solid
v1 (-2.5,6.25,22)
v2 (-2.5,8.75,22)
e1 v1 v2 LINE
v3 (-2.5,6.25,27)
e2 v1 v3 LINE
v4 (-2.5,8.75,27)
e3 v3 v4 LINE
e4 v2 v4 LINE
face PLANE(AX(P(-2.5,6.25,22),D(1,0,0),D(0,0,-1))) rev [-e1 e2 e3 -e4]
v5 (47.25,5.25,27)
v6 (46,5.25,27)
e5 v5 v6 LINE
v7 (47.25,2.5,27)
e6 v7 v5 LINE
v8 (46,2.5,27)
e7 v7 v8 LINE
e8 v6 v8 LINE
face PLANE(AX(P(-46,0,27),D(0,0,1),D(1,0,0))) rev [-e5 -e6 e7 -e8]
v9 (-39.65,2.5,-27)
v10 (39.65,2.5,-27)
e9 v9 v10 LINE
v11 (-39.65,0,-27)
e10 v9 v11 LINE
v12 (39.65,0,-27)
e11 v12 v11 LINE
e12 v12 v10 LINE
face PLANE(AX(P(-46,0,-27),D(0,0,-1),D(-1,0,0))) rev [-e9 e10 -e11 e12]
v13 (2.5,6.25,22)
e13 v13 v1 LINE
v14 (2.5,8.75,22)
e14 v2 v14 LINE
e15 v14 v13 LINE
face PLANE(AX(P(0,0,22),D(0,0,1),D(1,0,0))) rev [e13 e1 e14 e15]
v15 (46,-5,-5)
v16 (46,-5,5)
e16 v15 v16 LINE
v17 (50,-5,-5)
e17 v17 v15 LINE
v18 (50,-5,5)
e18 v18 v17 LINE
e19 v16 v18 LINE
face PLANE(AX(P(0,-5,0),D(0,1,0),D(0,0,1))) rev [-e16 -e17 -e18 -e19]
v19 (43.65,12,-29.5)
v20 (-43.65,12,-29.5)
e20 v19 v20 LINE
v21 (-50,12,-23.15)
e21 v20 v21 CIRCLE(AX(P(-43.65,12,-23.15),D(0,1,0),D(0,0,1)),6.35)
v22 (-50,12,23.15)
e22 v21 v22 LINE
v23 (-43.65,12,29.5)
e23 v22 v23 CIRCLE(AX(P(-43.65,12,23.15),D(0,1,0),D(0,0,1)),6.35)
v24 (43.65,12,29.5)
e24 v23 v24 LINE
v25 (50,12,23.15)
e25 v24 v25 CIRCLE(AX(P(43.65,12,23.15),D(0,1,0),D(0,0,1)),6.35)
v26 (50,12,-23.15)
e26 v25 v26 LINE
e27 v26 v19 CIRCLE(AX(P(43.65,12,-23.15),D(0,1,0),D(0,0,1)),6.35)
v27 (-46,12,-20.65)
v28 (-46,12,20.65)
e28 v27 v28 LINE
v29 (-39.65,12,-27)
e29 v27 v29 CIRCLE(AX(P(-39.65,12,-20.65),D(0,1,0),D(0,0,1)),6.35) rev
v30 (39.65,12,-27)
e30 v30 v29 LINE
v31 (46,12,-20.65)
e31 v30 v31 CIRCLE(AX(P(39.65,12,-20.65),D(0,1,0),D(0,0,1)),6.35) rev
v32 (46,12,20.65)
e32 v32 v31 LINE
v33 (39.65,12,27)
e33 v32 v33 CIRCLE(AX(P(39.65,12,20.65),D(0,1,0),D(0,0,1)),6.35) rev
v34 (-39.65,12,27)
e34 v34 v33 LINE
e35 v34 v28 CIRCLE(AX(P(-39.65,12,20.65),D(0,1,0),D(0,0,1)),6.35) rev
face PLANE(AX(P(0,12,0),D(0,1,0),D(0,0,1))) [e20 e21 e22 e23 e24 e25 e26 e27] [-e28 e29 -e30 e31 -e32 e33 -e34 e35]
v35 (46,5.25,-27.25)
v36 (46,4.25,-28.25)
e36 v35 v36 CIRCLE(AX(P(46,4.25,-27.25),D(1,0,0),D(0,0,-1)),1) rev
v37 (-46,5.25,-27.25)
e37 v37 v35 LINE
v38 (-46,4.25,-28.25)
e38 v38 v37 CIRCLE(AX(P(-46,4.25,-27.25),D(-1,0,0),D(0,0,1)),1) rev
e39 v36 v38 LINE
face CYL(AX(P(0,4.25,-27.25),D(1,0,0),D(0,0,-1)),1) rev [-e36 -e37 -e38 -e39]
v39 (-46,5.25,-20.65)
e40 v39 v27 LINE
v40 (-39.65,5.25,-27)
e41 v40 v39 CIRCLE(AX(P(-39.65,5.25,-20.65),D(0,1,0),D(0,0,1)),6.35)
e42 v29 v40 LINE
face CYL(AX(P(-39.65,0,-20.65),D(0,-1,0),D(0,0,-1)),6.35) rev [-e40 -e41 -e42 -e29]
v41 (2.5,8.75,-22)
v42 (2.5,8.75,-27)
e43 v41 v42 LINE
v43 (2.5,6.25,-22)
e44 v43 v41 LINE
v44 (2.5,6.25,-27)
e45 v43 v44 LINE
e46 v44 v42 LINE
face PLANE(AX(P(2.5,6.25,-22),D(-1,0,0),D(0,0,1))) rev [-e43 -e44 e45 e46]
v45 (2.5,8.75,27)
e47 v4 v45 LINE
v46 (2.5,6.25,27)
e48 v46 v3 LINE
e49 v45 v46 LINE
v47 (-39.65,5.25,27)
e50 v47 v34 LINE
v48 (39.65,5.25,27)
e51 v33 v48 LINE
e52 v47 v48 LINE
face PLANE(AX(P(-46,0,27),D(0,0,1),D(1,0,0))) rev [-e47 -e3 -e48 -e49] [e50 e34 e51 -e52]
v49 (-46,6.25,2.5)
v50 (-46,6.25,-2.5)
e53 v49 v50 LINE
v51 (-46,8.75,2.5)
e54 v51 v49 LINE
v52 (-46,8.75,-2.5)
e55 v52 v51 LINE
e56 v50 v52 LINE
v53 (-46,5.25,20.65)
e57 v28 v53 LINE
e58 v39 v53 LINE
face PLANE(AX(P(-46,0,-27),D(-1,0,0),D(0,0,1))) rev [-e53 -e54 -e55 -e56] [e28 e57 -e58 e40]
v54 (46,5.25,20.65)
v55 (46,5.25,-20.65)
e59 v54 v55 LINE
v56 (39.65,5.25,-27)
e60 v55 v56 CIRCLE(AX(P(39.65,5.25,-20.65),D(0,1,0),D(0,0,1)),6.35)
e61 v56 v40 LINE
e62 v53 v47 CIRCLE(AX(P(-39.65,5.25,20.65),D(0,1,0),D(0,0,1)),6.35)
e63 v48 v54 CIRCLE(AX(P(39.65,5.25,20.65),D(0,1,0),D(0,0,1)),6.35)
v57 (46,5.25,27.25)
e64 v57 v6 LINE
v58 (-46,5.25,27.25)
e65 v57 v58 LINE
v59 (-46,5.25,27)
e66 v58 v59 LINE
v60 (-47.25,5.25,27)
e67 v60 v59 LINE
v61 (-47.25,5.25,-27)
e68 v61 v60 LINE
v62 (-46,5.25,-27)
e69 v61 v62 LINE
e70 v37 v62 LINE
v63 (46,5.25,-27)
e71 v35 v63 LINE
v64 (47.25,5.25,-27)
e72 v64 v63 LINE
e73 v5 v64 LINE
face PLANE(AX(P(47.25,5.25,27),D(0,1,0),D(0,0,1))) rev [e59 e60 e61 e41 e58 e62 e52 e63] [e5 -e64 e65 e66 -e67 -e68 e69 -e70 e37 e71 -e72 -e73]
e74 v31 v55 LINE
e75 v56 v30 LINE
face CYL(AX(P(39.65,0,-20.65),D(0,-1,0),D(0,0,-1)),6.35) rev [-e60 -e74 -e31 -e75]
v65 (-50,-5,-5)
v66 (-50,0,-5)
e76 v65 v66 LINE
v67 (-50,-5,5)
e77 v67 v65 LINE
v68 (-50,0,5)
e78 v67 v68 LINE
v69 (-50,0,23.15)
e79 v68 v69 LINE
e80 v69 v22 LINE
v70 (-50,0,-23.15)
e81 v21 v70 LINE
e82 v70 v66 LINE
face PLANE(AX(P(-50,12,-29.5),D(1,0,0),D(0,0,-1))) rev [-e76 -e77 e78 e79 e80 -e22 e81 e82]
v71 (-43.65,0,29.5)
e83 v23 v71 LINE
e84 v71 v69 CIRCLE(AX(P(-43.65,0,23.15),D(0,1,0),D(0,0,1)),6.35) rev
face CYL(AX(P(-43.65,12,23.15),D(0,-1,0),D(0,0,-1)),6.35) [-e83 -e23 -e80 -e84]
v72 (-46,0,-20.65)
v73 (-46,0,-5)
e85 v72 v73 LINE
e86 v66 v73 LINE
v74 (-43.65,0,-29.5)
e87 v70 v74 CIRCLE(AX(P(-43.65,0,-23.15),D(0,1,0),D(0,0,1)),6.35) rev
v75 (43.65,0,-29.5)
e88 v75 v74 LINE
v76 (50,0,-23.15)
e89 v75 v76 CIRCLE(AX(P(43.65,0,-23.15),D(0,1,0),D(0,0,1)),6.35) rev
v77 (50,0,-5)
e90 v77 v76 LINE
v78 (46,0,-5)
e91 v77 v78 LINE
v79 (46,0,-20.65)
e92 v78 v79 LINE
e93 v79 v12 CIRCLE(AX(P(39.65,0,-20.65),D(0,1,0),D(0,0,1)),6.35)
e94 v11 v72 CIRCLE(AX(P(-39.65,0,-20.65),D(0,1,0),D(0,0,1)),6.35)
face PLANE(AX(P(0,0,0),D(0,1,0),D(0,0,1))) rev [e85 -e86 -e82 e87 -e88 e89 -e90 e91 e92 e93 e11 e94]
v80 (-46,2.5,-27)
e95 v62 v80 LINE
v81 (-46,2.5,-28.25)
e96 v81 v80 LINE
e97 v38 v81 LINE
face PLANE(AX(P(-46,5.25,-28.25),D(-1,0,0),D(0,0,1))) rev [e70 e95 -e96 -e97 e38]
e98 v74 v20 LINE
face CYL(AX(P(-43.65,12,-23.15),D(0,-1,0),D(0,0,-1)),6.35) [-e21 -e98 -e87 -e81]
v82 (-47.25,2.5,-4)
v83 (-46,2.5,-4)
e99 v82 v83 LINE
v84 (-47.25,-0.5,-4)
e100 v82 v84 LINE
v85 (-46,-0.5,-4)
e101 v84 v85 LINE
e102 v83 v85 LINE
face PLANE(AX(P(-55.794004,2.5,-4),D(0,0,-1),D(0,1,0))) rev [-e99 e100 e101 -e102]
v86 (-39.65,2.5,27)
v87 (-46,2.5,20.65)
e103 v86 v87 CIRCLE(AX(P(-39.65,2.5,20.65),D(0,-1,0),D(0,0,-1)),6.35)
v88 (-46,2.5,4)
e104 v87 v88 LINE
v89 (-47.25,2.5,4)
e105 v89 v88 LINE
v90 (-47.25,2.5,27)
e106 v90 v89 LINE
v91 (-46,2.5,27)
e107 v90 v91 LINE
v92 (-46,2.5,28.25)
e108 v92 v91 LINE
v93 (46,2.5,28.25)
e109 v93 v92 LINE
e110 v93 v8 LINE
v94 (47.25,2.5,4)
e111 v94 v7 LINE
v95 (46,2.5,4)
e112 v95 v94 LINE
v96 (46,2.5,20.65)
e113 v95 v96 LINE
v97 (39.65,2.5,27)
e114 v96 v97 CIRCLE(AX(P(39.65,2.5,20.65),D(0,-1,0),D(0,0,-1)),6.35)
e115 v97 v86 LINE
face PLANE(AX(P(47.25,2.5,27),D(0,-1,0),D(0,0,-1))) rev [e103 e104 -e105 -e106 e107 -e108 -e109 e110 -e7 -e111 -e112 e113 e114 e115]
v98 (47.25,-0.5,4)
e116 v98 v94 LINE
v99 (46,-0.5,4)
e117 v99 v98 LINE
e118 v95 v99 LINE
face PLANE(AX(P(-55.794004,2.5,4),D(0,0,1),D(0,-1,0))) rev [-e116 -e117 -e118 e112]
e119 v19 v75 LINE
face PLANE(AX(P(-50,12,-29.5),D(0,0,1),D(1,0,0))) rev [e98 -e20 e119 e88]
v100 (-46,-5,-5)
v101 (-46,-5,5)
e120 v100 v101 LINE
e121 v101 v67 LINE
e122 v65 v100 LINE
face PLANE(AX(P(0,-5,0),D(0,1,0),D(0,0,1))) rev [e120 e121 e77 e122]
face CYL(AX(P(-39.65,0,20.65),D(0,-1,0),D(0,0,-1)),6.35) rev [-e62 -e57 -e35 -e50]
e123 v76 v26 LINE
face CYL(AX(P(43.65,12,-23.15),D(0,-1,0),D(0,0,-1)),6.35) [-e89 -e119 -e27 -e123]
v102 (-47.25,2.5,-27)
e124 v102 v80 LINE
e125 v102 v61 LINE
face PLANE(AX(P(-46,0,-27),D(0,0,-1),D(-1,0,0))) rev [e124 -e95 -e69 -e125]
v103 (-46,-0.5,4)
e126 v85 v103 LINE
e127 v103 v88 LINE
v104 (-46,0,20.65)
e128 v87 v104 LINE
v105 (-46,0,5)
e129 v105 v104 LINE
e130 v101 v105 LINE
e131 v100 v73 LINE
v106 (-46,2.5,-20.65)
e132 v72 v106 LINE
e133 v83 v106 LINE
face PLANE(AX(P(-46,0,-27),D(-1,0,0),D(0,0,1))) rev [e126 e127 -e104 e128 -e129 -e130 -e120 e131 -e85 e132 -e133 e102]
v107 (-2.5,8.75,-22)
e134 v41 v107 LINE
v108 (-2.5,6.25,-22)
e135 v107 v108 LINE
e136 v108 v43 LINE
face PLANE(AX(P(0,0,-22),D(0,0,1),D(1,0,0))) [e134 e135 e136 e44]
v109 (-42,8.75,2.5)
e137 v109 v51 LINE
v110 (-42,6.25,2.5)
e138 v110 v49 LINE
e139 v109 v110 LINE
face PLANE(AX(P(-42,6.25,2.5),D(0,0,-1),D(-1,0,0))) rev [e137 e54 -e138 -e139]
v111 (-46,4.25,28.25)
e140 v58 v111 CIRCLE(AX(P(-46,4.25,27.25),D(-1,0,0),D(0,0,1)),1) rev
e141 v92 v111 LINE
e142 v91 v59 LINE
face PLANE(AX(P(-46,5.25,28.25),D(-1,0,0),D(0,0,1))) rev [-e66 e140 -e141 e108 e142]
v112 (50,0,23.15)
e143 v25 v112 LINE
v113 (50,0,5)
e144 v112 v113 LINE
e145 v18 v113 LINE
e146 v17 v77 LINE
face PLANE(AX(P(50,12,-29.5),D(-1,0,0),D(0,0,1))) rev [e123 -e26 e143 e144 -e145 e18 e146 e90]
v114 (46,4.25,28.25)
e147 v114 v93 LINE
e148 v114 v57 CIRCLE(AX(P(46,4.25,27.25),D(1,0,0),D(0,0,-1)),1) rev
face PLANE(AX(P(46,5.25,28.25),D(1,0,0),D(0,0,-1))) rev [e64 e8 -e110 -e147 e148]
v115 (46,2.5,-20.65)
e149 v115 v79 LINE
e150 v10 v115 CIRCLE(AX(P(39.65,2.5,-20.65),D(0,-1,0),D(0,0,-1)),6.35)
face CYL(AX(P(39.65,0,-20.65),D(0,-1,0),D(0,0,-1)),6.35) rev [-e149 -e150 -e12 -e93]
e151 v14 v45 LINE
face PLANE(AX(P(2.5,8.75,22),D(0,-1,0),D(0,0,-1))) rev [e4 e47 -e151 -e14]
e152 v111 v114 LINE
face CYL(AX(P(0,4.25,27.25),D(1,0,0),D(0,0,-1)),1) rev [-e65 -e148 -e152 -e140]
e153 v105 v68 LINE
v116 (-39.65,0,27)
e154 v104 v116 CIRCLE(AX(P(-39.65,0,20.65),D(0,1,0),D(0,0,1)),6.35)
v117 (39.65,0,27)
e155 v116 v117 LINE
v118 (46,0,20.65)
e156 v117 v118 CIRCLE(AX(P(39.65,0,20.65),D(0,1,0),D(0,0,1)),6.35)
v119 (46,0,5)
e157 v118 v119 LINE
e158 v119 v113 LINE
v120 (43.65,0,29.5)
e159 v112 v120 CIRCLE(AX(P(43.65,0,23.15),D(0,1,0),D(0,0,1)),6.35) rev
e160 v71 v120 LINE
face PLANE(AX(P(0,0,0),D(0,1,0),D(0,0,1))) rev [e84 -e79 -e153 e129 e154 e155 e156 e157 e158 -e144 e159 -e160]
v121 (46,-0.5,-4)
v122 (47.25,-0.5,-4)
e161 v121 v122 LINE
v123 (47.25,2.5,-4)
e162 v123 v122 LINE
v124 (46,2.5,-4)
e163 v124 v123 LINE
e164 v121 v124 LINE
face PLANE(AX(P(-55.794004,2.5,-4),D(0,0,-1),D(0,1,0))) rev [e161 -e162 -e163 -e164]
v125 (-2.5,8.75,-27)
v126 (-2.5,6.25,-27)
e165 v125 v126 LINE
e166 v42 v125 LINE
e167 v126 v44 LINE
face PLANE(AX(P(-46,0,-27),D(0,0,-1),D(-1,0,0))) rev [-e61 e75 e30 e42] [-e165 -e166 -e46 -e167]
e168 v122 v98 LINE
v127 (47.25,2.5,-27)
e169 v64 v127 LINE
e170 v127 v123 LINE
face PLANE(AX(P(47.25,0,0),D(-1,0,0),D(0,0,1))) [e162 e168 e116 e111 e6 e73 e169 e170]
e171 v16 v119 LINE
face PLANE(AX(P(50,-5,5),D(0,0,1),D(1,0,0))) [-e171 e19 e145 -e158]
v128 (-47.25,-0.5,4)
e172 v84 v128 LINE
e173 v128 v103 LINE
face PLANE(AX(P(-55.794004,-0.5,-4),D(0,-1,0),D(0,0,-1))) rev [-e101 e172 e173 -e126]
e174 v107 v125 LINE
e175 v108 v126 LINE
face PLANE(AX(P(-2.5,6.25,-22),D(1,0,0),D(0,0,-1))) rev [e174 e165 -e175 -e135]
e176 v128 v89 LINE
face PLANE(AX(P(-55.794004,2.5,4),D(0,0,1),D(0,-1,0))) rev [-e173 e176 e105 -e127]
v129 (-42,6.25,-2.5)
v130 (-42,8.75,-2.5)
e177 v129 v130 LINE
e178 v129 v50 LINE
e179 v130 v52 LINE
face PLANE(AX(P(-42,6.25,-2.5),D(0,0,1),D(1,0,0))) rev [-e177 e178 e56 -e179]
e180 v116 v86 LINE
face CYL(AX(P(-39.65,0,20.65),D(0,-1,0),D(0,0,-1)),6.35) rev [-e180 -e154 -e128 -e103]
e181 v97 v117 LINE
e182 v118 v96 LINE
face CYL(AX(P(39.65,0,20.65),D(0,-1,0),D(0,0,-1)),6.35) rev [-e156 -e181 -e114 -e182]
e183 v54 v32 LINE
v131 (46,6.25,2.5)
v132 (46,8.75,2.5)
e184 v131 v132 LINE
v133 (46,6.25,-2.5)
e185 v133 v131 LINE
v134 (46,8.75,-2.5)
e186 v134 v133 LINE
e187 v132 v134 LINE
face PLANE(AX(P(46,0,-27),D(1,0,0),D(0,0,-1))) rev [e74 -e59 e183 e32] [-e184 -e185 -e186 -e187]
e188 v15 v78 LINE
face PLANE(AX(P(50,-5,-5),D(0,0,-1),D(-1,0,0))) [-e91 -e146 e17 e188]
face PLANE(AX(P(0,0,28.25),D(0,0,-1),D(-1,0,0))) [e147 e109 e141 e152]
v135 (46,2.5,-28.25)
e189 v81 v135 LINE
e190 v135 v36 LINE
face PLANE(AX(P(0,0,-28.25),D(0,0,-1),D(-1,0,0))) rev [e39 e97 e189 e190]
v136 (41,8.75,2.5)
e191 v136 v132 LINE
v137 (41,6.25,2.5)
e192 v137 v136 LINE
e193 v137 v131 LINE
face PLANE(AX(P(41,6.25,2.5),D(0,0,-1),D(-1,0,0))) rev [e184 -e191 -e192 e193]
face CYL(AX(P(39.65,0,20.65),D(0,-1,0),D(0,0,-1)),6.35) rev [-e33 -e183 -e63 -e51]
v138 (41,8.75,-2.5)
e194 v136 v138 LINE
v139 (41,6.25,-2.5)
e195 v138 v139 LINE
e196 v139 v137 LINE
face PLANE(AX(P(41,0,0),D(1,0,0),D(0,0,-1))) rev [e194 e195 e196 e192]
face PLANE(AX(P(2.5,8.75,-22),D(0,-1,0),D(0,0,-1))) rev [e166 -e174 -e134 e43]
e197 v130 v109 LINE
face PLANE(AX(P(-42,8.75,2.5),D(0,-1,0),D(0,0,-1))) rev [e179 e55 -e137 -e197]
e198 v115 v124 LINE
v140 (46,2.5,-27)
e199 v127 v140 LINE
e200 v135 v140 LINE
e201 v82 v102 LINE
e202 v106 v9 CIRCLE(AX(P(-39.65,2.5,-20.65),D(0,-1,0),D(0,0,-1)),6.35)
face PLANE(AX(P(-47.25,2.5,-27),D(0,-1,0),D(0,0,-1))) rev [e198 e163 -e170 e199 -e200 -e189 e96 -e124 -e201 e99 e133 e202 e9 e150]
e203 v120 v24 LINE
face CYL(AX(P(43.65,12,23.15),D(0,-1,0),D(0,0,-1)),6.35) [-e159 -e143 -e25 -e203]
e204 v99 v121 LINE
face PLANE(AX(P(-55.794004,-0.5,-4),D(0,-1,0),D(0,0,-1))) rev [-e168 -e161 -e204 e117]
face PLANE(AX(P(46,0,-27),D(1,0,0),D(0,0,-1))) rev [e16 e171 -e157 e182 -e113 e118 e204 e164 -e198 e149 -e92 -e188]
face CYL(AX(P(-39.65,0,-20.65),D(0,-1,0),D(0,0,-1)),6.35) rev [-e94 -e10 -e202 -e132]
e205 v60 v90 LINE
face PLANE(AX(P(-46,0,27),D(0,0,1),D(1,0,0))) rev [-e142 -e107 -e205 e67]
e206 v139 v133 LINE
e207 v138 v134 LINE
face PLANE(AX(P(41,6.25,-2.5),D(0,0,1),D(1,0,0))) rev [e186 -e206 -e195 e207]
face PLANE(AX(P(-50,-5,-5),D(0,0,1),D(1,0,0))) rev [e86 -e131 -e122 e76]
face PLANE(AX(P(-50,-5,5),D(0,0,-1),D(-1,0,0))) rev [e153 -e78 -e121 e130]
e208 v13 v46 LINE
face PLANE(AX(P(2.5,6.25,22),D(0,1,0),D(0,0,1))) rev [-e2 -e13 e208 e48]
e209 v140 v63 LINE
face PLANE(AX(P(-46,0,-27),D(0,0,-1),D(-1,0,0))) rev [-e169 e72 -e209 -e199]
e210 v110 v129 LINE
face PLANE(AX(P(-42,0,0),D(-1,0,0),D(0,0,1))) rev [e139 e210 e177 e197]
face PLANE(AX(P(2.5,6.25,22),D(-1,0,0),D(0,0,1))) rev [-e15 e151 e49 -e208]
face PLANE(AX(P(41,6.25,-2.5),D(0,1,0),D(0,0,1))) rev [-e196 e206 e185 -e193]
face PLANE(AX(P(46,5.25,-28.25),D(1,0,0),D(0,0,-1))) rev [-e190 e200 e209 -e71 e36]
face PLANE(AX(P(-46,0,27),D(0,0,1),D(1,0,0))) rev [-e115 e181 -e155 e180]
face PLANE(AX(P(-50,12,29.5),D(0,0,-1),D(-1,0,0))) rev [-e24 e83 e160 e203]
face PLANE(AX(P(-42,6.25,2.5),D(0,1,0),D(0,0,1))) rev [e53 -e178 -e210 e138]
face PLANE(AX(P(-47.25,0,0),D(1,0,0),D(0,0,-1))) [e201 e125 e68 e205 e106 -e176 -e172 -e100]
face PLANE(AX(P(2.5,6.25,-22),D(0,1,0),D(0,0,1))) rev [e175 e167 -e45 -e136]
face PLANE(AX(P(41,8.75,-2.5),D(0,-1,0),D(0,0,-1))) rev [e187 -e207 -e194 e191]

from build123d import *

# Parameters (mm, degrees)
SKETCH1_W                      = 100
SKETCH1_H                      = 59
BOSS_EXTRUDE1_DEPTH            = 12
SKETCH2_W                      = 92
SKETCH2_H                      = 54
CUT_EXTRUDE1_DEPTH             = 60.281109976
SKETCH3_W                      = 54
SKETCH3_H                      = 2.75
CUT_EXTRUDE2_DEPTH             = 1.25
SKETCH4_W                      = 54
SKETCH4_H                      = 2.75
CUT_EXTRUDE3_DEPTH             = 1.25
SKETCH5_W                      = 92
SKETCH5_H                      = 2.75
CUT_EXTRUDE4_DEPTH             = 1.25
SKETCH6_W                      = 92
SKETCH6_H                      = 2.75
CUT_EXTRUDE5_DEPTH             = 1.25
FILLET1_R                      = 1
SKETCH7_W                      = 4
SKETCH7_H                      = 10
BOSS_EXTRUDE2_DEPTH            = 5
CUT_EXTRUDE6_REACH             = 103.145
SKETCH8_W                      = 8
SKETCH8_H                      = 3
CUT_EXTRUDE6_DIRECTION_2_REACH = 103.145
FILLET2_R                      = 6.35
SKETCH9_W                      = 5
SKETCH9_H                      = 2.5
BOSS_EXTRUDE3_DEPTH            = 5
SKETCH10_W                     = 5
SKETCH10_H                     = 2.5
BOSS_EXTRUDE4_DEPTH            = 5
SKETCH11_W                     = 5
SKETCH11_H                     = 2.5
BOSS_EXTRUDE5_DEPTH            = 5
SKETCH12_W                     = 5
SKETCH12_H                     = 2.5
BOSS_EXTRUDE6_DEPTH            = 4


with BuildPart() as part:
    # Sketch1 → Boss-Extrude1 (new body)
    with BuildSketch(Plane(origin=(0, 0, 0), x_dir=(1, 0, 0), z_dir=(0, 1, 0))):
        Rectangle(SKETCH1_W, SKETCH1_H)
    extrude(amount=BOSS_EXTRUDE1_DEPTH)

    # Sketch2 → Cut-Extrude1 (cut, through all)
    with BuildSketch(Plane(origin=(0, 12, 0), x_dir=(1, 0, 0), z_dir=(0, 1, 0))):
        Rectangle(SKETCH2_W, SKETCH2_H)
    extrude(amount=-CUT_EXTRUDE1_DEPTH, mode=Mode.SUBTRACT)

    # Sketch3 → Cut-Extrude2 (cut)
    with BuildSketch(Plane(origin=(-46, 0, 0), x_dir=(0, 0, -1), z_dir=(1, 0, 0))):
        with Locations((0, 3.875)):
            Rectangle(SKETCH3_W, SKETCH3_H)
    extrude(amount=-CUT_EXTRUDE2_DEPTH, mode=Mode.SUBTRACT)

    # Sketch4 → Cut-Extrude3 (cut)
    with BuildSketch(Plane.ZY.offset(-46)):
        with Locations((0, 3.875)):
            Rectangle(SKETCH4_W, SKETCH4_H)
    extrude(amount=-CUT_EXTRUDE3_DEPTH, mode=Mode.SUBTRACT)

    # Sketch5 → Cut-Extrude4 (cut)
    with BuildSketch(Plane.XY.offset(-27)):
        with Locations((0, 3.875)):
            Rectangle(SKETCH5_W, SKETCH5_H)
    extrude(amount=-CUT_EXTRUDE4_DEPTH, mode=Mode.SUBTRACT)

    # Sketch6 → Cut-Extrude5 (cut)
    with BuildSketch(Plane(origin=(0, 0, 27), x_dir=(-1, 0, 0), z_dir=(0, 0, -1))):
        with Locations((0, 3.875)):
            Rectangle(SKETCH6_W, SKETCH6_H)
    extrude(amount=-CUT_EXTRUDE5_DEPTH, mode=Mode.SUBTRACT)

    # Fillet1
    fillet1_edges = [part.edges().sort_by_distance(p)[0] for p in [
        (0, 5.25, -28.25),
        (0, 5.25, 28.25),
    ]]
    fillet(fillet1_edges, radius=FILLET1_R)

    # Sketch7 → Boss-Extrude2 (add)
    with BuildSketch(Plane.XZ):
        with Locations((-48, 0)):
            Rectangle(SKETCH7_W, SKETCH7_H)
    boss_extrude2 = extrude(amount=BOSS_EXTRUDE2_DEPTH)

    # Mirror2: Boss-Extrude2 across plane
    add(boss_extrude2.mirror(Plane(origin=(0, 0, 0), x_dir=(0, 0, 1), z_dir=(1, 0, 0))))

    # Cut-Extrude6: up to this face of the body (flat: up to its plane)
    cut_extrude6_end = Plane(part.part.faces().sort_by_distance((-47.25, 3.875, 0))[0])
    # Sketch8 → Cut-Extrude6 (cut, up to the picked face)
    with BuildSketch(Plane(origin=(-46, 0, 0), x_dir=(0, 0, -1), z_dir=(1, 0, 0)), mode=Mode.PRIVATE) as cut_extrude6_sk1:
        with Locations((0, 1)):
            Rectangle(SKETCH8_W, SKETCH8_H)
    cut_extrude6_tool1 = split(extrude(cut_extrude6_sk1.sketch, amount=-CUT_EXTRUDE6_REACH, mode=Mode.PRIVATE), bisect_by=cut_extrude6_end, keep=Keep.BOTH, mode=Mode.PRIVATE)
    add(cut_extrude6_tool1.solids().sort_by(Axis((-46, 1, 0), (-1, 0, 0)))[0], mode=Mode.SUBTRACT)

    # Cut-Extrude6 direction 2: up to this face of the body (flat: up to its plane)
    cut_extrude6_direction_2_end = Plane(part.part.faces().sort_by_distance((47.25, 3.875, 0))[0])
    # Sketch8 → Cut-Extrude6 direction 2 (cut, up to the picked face)
    with BuildSketch(Plane(origin=(-46, 0, 0), x_dir=(0, 0, -1), z_dir=(1, 0, 0)), mode=Mode.PRIVATE) as cut_extrude6_direction_2_sk1:
        with Locations((0, 1)):
            Rectangle(SKETCH8_W, SKETCH8_H)
    cut_extrude6_direction_2_tool1 = split(extrude(cut_extrude6_direction_2_sk1.sketch, amount=CUT_EXTRUDE6_DIRECTION_2_REACH, mode=Mode.PRIVATE), bisect_by=cut_extrude6_direction_2_end, keep=Keep.BOTH, mode=Mode.PRIVATE)
    add(cut_extrude6_direction_2_tool1.solids().sort_by(Axis((-46, 1, 0), (1, 0, 0)))[0], mode=Mode.SUBTRACT)

    # Fillet2
    # the kernel refuses this fillet: 6.35 mm, written as the material it adds along each edge
    with BuildSketch(Plane(origin=(-46, 18.375, -27), x_dir=(1, 0, 0), z_dir=(0, -1, 0))) as fillet2_piece_1_section:
        with BuildLine():
            CenterArc((FILLET2_R, FILLET2_R), FILLET2_R, 180, 90)
            Line((0, FILLET2_R), (0, 0))
            Line((0, 0), (FILLET2_R, 0))
        make_face()
    fillet2_piece_1 = extrude(amount=18.375, mode=Mode.PRIVATE)
    fillet2_piece_1 = split(fillet2_piece_1, bisect_by=Plane(origin=(-44.562391024, 5.25, -25.562391024), z_dir=(0, 1, 0)), keep=Keep.TOP, mode=Mode.PRIVATE)
    fillet2_piece_1 = split(fillet2_piece_1, bisect_by=Plane(origin=(-44.562391024, 12, -25.562391024), z_dir=(0, -1, 0)), keep=Keep.TOP, mode=Mode.PRIVATE)
    add(fillet2_piece_1)
    with BuildSketch(Plane(origin=(-46, 2.5, -27), x_dir=(1, 0, 0), z_dir=(0, -1, 0)), Plane(origin=(-46, 2.5, 27), x_dir=(0, 0, -1), z_dir=(0, -1, 0))) as fillet2_piece_2:
        with BuildLine():
            CenterArc((FILLET2_R, FILLET2_R), FILLET2_R, 180, 90)
            Line((0, FILLET2_R), (0, 0))
            Line((0, 0), (FILLET2_R, 0))
        make_face()
    extrude(amount=2.5)
    with BuildSketch(Plane(origin=(46, 18.375, -27), x_dir=(-1, 0, 0), z_dir=(0, -1, 0))) as fillet2_piece_3_section:
        with BuildLine():
            CenterArc((FILLET2_R, -FILLET2_R), FILLET2_R, 90, 90)
            Line((0, -FILLET2_R), (0, 0))
            Line((0, 0), (FILLET2_R, 0))
        make_face()
    fillet2_piece_3 = extrude(amount=18.375, mode=Mode.PRIVATE)
    fillet2_piece_3 = split(fillet2_piece_3, bisect_by=Plane(origin=(44.562391024, 5.25, -25.562391024), z_dir=(0, 1, 0)), keep=Keep.TOP, mode=Mode.PRIVATE)
    fillet2_piece_3 = split(fillet2_piece_3, bisect_by=Plane(origin=(44.562391024, 12, -25.562391024), z_dir=(0, -1, 0)), keep=Keep.TOP, mode=Mode.PRIVATE)
    add(fillet2_piece_3)
    with BuildSketch(Plane(origin=(46, 2.5, -27), x_dir=(-1, 0, 0), z_dir=(0, -1, 0)), Plane(origin=(46, 2.5, 27), x_dir=(0, 0, -1), z_dir=(0, -1, 0))) as fillet2_piece_4:
        with BuildLine():
            CenterArc((FILLET2_R, -FILLET2_R), FILLET2_R, 90, 90)
            Line((0, -FILLET2_R), (0, 0))
            Line((0, 0), (FILLET2_R, 0))
        make_face()
    extrude(amount=2.5)
    with BuildSketch(Plane(origin=(-46, 18.375, 27), x_dir=(0, 0, -1), z_dir=(0, -1, 0))) as fillet2_piece_5_section:
        with BuildLine():
            CenterArc((FILLET2_R, FILLET2_R), FILLET2_R, 180, 90)
            Line((0, FILLET2_R), (0, 0))
            Line((0, 0), (FILLET2_R, 0))
        make_face()
    fillet2_piece_5 = extrude(amount=18.375, mode=Mode.PRIVATE)
    fillet2_piece_5 = split(fillet2_piece_5, bisect_by=Plane(origin=(-44.562391024, 12, 25.562391024), z_dir=(0, -1, 0)), keep=Keep.TOP, mode=Mode.PRIVATE)
    fillet2_piece_5 = split(fillet2_piece_5, bisect_by=Plane(origin=(-44.562391024, 5.25, 25.562391024), z_dir=(0, 1, 0)), keep=Keep.TOP, mode=Mode.PRIVATE)
    add(fillet2_piece_5)
    with BuildSketch(Plane(origin=(46, 18.375, 27), x_dir=(0, 0, -1), z_dir=(0, -1, 0))) as fillet2_piece_6_section:
        with BuildLine():
            CenterArc((FILLET2_R, -FILLET2_R), FILLET2_R, 90, 90)
            Line((0, -FILLET2_R), (0, 0))
            Line((0, 0), (FILLET2_R, 0))
        make_face()
    fillet2_piece_6 = extrude(amount=18.375, mode=Mode.PRIVATE)
    fillet2_piece_6 = split(fillet2_piece_6, bisect_by=Plane(origin=(44.562391024, 12, 25.562391024), z_dir=(0, -1, 0)), keep=Keep.TOP, mode=Mode.PRIVATE)
    fillet2_piece_6 = split(fillet2_piece_6, bisect_by=Plane(origin=(44.562391024, 5.25, 25.562391024), z_dir=(0, 1, 0)), keep=Keep.TOP, mode=Mode.PRIVATE)
    add(fillet2_piece_6)
    # the kernel refuses this fillet: 6.35 mm, written as the material it takes off along each edge
    with BuildSketch(Plane(origin=(-50, -15.875, -29.5), x_dir=(1, 0, 0), z_dir=(0, 1, 0)), Plane(origin=(-50, -15.875, 29.5), x_dir=(0, 0, -1), z_dir=(0, 1, 0))) as fillet2_2_piece_1:
        with BuildLine():
            CenterArc((FILLET2_R, -FILLET2_R), FILLET2_R, 90, 90)
            Line((0, -FILLET2_R), (0, 0))
            Line((0, 0), (FILLET2_R, 0))
        make_face()
    extrude(amount=43.75, mode=Mode.SUBTRACT)
    with BuildSketch(Plane(origin=(50, -15.875, 29.5), x_dir=(0, 0, -1), z_dir=(0, 1, 0)), Plane(origin=(50, -15.875, -29.5), x_dir=(-1, 0, 0), z_dir=(0, 1, 0))) as fillet2_2_piece_2:
        with BuildLine():
            CenterArc((FILLET2_R, FILLET2_R), FILLET2_R, 180, 90)
            Line((0, FILLET2_R), (0, 0))
            Line((0, 0), (FILLET2_R, 0))
        make_face()
    extrude(amount=43.75, mode=Mode.SUBTRACT)

    # Sketch9 → Boss-Extrude3 (add)
    with BuildSketch(Plane(origin=(0, 0, 27), x_dir=(-1, 0, 0), z_dir=(0, 0, -1))):
        with Locations((0, 7.5)):
            Rectangle(SKETCH9_W, SKETCH9_H)
    extrude(amount=BOSS_EXTRUDE3_DEPTH)

    # Sketch10 → Boss-Extrude4 (add)
    with BuildSketch(Plane.XY.offset(-27)):
        with Locations((0, 7.5)):
            Rectangle(SKETCH10_W, SKETCH10_H)
    extrude(amount=BOSS_EXTRUDE4_DEPTH)

    # Sketch11 → Boss-Extrude5 (add)
    with BuildSketch(Plane.ZY.offset(-46)):
        with Locations((0, 7.5)):
            Rectangle(SKETCH11_W, SKETCH11_H)
    extrude(amount=BOSS_EXTRUDE5_DEPTH)

    # Sketch12 → Boss-Extrude6 (add)
    with BuildSketch(Plane(origin=(-46, 0, 0), x_dir=(0, 0, -1), z_dir=(1, 0, 0))):
        with Locations((0, 7.5)):
            Rectangle(SKETCH12_W, SKETCH12_H)
    extrude(amount=BOSS_EXTRUDE6_DEPTH)


solid = part.part
